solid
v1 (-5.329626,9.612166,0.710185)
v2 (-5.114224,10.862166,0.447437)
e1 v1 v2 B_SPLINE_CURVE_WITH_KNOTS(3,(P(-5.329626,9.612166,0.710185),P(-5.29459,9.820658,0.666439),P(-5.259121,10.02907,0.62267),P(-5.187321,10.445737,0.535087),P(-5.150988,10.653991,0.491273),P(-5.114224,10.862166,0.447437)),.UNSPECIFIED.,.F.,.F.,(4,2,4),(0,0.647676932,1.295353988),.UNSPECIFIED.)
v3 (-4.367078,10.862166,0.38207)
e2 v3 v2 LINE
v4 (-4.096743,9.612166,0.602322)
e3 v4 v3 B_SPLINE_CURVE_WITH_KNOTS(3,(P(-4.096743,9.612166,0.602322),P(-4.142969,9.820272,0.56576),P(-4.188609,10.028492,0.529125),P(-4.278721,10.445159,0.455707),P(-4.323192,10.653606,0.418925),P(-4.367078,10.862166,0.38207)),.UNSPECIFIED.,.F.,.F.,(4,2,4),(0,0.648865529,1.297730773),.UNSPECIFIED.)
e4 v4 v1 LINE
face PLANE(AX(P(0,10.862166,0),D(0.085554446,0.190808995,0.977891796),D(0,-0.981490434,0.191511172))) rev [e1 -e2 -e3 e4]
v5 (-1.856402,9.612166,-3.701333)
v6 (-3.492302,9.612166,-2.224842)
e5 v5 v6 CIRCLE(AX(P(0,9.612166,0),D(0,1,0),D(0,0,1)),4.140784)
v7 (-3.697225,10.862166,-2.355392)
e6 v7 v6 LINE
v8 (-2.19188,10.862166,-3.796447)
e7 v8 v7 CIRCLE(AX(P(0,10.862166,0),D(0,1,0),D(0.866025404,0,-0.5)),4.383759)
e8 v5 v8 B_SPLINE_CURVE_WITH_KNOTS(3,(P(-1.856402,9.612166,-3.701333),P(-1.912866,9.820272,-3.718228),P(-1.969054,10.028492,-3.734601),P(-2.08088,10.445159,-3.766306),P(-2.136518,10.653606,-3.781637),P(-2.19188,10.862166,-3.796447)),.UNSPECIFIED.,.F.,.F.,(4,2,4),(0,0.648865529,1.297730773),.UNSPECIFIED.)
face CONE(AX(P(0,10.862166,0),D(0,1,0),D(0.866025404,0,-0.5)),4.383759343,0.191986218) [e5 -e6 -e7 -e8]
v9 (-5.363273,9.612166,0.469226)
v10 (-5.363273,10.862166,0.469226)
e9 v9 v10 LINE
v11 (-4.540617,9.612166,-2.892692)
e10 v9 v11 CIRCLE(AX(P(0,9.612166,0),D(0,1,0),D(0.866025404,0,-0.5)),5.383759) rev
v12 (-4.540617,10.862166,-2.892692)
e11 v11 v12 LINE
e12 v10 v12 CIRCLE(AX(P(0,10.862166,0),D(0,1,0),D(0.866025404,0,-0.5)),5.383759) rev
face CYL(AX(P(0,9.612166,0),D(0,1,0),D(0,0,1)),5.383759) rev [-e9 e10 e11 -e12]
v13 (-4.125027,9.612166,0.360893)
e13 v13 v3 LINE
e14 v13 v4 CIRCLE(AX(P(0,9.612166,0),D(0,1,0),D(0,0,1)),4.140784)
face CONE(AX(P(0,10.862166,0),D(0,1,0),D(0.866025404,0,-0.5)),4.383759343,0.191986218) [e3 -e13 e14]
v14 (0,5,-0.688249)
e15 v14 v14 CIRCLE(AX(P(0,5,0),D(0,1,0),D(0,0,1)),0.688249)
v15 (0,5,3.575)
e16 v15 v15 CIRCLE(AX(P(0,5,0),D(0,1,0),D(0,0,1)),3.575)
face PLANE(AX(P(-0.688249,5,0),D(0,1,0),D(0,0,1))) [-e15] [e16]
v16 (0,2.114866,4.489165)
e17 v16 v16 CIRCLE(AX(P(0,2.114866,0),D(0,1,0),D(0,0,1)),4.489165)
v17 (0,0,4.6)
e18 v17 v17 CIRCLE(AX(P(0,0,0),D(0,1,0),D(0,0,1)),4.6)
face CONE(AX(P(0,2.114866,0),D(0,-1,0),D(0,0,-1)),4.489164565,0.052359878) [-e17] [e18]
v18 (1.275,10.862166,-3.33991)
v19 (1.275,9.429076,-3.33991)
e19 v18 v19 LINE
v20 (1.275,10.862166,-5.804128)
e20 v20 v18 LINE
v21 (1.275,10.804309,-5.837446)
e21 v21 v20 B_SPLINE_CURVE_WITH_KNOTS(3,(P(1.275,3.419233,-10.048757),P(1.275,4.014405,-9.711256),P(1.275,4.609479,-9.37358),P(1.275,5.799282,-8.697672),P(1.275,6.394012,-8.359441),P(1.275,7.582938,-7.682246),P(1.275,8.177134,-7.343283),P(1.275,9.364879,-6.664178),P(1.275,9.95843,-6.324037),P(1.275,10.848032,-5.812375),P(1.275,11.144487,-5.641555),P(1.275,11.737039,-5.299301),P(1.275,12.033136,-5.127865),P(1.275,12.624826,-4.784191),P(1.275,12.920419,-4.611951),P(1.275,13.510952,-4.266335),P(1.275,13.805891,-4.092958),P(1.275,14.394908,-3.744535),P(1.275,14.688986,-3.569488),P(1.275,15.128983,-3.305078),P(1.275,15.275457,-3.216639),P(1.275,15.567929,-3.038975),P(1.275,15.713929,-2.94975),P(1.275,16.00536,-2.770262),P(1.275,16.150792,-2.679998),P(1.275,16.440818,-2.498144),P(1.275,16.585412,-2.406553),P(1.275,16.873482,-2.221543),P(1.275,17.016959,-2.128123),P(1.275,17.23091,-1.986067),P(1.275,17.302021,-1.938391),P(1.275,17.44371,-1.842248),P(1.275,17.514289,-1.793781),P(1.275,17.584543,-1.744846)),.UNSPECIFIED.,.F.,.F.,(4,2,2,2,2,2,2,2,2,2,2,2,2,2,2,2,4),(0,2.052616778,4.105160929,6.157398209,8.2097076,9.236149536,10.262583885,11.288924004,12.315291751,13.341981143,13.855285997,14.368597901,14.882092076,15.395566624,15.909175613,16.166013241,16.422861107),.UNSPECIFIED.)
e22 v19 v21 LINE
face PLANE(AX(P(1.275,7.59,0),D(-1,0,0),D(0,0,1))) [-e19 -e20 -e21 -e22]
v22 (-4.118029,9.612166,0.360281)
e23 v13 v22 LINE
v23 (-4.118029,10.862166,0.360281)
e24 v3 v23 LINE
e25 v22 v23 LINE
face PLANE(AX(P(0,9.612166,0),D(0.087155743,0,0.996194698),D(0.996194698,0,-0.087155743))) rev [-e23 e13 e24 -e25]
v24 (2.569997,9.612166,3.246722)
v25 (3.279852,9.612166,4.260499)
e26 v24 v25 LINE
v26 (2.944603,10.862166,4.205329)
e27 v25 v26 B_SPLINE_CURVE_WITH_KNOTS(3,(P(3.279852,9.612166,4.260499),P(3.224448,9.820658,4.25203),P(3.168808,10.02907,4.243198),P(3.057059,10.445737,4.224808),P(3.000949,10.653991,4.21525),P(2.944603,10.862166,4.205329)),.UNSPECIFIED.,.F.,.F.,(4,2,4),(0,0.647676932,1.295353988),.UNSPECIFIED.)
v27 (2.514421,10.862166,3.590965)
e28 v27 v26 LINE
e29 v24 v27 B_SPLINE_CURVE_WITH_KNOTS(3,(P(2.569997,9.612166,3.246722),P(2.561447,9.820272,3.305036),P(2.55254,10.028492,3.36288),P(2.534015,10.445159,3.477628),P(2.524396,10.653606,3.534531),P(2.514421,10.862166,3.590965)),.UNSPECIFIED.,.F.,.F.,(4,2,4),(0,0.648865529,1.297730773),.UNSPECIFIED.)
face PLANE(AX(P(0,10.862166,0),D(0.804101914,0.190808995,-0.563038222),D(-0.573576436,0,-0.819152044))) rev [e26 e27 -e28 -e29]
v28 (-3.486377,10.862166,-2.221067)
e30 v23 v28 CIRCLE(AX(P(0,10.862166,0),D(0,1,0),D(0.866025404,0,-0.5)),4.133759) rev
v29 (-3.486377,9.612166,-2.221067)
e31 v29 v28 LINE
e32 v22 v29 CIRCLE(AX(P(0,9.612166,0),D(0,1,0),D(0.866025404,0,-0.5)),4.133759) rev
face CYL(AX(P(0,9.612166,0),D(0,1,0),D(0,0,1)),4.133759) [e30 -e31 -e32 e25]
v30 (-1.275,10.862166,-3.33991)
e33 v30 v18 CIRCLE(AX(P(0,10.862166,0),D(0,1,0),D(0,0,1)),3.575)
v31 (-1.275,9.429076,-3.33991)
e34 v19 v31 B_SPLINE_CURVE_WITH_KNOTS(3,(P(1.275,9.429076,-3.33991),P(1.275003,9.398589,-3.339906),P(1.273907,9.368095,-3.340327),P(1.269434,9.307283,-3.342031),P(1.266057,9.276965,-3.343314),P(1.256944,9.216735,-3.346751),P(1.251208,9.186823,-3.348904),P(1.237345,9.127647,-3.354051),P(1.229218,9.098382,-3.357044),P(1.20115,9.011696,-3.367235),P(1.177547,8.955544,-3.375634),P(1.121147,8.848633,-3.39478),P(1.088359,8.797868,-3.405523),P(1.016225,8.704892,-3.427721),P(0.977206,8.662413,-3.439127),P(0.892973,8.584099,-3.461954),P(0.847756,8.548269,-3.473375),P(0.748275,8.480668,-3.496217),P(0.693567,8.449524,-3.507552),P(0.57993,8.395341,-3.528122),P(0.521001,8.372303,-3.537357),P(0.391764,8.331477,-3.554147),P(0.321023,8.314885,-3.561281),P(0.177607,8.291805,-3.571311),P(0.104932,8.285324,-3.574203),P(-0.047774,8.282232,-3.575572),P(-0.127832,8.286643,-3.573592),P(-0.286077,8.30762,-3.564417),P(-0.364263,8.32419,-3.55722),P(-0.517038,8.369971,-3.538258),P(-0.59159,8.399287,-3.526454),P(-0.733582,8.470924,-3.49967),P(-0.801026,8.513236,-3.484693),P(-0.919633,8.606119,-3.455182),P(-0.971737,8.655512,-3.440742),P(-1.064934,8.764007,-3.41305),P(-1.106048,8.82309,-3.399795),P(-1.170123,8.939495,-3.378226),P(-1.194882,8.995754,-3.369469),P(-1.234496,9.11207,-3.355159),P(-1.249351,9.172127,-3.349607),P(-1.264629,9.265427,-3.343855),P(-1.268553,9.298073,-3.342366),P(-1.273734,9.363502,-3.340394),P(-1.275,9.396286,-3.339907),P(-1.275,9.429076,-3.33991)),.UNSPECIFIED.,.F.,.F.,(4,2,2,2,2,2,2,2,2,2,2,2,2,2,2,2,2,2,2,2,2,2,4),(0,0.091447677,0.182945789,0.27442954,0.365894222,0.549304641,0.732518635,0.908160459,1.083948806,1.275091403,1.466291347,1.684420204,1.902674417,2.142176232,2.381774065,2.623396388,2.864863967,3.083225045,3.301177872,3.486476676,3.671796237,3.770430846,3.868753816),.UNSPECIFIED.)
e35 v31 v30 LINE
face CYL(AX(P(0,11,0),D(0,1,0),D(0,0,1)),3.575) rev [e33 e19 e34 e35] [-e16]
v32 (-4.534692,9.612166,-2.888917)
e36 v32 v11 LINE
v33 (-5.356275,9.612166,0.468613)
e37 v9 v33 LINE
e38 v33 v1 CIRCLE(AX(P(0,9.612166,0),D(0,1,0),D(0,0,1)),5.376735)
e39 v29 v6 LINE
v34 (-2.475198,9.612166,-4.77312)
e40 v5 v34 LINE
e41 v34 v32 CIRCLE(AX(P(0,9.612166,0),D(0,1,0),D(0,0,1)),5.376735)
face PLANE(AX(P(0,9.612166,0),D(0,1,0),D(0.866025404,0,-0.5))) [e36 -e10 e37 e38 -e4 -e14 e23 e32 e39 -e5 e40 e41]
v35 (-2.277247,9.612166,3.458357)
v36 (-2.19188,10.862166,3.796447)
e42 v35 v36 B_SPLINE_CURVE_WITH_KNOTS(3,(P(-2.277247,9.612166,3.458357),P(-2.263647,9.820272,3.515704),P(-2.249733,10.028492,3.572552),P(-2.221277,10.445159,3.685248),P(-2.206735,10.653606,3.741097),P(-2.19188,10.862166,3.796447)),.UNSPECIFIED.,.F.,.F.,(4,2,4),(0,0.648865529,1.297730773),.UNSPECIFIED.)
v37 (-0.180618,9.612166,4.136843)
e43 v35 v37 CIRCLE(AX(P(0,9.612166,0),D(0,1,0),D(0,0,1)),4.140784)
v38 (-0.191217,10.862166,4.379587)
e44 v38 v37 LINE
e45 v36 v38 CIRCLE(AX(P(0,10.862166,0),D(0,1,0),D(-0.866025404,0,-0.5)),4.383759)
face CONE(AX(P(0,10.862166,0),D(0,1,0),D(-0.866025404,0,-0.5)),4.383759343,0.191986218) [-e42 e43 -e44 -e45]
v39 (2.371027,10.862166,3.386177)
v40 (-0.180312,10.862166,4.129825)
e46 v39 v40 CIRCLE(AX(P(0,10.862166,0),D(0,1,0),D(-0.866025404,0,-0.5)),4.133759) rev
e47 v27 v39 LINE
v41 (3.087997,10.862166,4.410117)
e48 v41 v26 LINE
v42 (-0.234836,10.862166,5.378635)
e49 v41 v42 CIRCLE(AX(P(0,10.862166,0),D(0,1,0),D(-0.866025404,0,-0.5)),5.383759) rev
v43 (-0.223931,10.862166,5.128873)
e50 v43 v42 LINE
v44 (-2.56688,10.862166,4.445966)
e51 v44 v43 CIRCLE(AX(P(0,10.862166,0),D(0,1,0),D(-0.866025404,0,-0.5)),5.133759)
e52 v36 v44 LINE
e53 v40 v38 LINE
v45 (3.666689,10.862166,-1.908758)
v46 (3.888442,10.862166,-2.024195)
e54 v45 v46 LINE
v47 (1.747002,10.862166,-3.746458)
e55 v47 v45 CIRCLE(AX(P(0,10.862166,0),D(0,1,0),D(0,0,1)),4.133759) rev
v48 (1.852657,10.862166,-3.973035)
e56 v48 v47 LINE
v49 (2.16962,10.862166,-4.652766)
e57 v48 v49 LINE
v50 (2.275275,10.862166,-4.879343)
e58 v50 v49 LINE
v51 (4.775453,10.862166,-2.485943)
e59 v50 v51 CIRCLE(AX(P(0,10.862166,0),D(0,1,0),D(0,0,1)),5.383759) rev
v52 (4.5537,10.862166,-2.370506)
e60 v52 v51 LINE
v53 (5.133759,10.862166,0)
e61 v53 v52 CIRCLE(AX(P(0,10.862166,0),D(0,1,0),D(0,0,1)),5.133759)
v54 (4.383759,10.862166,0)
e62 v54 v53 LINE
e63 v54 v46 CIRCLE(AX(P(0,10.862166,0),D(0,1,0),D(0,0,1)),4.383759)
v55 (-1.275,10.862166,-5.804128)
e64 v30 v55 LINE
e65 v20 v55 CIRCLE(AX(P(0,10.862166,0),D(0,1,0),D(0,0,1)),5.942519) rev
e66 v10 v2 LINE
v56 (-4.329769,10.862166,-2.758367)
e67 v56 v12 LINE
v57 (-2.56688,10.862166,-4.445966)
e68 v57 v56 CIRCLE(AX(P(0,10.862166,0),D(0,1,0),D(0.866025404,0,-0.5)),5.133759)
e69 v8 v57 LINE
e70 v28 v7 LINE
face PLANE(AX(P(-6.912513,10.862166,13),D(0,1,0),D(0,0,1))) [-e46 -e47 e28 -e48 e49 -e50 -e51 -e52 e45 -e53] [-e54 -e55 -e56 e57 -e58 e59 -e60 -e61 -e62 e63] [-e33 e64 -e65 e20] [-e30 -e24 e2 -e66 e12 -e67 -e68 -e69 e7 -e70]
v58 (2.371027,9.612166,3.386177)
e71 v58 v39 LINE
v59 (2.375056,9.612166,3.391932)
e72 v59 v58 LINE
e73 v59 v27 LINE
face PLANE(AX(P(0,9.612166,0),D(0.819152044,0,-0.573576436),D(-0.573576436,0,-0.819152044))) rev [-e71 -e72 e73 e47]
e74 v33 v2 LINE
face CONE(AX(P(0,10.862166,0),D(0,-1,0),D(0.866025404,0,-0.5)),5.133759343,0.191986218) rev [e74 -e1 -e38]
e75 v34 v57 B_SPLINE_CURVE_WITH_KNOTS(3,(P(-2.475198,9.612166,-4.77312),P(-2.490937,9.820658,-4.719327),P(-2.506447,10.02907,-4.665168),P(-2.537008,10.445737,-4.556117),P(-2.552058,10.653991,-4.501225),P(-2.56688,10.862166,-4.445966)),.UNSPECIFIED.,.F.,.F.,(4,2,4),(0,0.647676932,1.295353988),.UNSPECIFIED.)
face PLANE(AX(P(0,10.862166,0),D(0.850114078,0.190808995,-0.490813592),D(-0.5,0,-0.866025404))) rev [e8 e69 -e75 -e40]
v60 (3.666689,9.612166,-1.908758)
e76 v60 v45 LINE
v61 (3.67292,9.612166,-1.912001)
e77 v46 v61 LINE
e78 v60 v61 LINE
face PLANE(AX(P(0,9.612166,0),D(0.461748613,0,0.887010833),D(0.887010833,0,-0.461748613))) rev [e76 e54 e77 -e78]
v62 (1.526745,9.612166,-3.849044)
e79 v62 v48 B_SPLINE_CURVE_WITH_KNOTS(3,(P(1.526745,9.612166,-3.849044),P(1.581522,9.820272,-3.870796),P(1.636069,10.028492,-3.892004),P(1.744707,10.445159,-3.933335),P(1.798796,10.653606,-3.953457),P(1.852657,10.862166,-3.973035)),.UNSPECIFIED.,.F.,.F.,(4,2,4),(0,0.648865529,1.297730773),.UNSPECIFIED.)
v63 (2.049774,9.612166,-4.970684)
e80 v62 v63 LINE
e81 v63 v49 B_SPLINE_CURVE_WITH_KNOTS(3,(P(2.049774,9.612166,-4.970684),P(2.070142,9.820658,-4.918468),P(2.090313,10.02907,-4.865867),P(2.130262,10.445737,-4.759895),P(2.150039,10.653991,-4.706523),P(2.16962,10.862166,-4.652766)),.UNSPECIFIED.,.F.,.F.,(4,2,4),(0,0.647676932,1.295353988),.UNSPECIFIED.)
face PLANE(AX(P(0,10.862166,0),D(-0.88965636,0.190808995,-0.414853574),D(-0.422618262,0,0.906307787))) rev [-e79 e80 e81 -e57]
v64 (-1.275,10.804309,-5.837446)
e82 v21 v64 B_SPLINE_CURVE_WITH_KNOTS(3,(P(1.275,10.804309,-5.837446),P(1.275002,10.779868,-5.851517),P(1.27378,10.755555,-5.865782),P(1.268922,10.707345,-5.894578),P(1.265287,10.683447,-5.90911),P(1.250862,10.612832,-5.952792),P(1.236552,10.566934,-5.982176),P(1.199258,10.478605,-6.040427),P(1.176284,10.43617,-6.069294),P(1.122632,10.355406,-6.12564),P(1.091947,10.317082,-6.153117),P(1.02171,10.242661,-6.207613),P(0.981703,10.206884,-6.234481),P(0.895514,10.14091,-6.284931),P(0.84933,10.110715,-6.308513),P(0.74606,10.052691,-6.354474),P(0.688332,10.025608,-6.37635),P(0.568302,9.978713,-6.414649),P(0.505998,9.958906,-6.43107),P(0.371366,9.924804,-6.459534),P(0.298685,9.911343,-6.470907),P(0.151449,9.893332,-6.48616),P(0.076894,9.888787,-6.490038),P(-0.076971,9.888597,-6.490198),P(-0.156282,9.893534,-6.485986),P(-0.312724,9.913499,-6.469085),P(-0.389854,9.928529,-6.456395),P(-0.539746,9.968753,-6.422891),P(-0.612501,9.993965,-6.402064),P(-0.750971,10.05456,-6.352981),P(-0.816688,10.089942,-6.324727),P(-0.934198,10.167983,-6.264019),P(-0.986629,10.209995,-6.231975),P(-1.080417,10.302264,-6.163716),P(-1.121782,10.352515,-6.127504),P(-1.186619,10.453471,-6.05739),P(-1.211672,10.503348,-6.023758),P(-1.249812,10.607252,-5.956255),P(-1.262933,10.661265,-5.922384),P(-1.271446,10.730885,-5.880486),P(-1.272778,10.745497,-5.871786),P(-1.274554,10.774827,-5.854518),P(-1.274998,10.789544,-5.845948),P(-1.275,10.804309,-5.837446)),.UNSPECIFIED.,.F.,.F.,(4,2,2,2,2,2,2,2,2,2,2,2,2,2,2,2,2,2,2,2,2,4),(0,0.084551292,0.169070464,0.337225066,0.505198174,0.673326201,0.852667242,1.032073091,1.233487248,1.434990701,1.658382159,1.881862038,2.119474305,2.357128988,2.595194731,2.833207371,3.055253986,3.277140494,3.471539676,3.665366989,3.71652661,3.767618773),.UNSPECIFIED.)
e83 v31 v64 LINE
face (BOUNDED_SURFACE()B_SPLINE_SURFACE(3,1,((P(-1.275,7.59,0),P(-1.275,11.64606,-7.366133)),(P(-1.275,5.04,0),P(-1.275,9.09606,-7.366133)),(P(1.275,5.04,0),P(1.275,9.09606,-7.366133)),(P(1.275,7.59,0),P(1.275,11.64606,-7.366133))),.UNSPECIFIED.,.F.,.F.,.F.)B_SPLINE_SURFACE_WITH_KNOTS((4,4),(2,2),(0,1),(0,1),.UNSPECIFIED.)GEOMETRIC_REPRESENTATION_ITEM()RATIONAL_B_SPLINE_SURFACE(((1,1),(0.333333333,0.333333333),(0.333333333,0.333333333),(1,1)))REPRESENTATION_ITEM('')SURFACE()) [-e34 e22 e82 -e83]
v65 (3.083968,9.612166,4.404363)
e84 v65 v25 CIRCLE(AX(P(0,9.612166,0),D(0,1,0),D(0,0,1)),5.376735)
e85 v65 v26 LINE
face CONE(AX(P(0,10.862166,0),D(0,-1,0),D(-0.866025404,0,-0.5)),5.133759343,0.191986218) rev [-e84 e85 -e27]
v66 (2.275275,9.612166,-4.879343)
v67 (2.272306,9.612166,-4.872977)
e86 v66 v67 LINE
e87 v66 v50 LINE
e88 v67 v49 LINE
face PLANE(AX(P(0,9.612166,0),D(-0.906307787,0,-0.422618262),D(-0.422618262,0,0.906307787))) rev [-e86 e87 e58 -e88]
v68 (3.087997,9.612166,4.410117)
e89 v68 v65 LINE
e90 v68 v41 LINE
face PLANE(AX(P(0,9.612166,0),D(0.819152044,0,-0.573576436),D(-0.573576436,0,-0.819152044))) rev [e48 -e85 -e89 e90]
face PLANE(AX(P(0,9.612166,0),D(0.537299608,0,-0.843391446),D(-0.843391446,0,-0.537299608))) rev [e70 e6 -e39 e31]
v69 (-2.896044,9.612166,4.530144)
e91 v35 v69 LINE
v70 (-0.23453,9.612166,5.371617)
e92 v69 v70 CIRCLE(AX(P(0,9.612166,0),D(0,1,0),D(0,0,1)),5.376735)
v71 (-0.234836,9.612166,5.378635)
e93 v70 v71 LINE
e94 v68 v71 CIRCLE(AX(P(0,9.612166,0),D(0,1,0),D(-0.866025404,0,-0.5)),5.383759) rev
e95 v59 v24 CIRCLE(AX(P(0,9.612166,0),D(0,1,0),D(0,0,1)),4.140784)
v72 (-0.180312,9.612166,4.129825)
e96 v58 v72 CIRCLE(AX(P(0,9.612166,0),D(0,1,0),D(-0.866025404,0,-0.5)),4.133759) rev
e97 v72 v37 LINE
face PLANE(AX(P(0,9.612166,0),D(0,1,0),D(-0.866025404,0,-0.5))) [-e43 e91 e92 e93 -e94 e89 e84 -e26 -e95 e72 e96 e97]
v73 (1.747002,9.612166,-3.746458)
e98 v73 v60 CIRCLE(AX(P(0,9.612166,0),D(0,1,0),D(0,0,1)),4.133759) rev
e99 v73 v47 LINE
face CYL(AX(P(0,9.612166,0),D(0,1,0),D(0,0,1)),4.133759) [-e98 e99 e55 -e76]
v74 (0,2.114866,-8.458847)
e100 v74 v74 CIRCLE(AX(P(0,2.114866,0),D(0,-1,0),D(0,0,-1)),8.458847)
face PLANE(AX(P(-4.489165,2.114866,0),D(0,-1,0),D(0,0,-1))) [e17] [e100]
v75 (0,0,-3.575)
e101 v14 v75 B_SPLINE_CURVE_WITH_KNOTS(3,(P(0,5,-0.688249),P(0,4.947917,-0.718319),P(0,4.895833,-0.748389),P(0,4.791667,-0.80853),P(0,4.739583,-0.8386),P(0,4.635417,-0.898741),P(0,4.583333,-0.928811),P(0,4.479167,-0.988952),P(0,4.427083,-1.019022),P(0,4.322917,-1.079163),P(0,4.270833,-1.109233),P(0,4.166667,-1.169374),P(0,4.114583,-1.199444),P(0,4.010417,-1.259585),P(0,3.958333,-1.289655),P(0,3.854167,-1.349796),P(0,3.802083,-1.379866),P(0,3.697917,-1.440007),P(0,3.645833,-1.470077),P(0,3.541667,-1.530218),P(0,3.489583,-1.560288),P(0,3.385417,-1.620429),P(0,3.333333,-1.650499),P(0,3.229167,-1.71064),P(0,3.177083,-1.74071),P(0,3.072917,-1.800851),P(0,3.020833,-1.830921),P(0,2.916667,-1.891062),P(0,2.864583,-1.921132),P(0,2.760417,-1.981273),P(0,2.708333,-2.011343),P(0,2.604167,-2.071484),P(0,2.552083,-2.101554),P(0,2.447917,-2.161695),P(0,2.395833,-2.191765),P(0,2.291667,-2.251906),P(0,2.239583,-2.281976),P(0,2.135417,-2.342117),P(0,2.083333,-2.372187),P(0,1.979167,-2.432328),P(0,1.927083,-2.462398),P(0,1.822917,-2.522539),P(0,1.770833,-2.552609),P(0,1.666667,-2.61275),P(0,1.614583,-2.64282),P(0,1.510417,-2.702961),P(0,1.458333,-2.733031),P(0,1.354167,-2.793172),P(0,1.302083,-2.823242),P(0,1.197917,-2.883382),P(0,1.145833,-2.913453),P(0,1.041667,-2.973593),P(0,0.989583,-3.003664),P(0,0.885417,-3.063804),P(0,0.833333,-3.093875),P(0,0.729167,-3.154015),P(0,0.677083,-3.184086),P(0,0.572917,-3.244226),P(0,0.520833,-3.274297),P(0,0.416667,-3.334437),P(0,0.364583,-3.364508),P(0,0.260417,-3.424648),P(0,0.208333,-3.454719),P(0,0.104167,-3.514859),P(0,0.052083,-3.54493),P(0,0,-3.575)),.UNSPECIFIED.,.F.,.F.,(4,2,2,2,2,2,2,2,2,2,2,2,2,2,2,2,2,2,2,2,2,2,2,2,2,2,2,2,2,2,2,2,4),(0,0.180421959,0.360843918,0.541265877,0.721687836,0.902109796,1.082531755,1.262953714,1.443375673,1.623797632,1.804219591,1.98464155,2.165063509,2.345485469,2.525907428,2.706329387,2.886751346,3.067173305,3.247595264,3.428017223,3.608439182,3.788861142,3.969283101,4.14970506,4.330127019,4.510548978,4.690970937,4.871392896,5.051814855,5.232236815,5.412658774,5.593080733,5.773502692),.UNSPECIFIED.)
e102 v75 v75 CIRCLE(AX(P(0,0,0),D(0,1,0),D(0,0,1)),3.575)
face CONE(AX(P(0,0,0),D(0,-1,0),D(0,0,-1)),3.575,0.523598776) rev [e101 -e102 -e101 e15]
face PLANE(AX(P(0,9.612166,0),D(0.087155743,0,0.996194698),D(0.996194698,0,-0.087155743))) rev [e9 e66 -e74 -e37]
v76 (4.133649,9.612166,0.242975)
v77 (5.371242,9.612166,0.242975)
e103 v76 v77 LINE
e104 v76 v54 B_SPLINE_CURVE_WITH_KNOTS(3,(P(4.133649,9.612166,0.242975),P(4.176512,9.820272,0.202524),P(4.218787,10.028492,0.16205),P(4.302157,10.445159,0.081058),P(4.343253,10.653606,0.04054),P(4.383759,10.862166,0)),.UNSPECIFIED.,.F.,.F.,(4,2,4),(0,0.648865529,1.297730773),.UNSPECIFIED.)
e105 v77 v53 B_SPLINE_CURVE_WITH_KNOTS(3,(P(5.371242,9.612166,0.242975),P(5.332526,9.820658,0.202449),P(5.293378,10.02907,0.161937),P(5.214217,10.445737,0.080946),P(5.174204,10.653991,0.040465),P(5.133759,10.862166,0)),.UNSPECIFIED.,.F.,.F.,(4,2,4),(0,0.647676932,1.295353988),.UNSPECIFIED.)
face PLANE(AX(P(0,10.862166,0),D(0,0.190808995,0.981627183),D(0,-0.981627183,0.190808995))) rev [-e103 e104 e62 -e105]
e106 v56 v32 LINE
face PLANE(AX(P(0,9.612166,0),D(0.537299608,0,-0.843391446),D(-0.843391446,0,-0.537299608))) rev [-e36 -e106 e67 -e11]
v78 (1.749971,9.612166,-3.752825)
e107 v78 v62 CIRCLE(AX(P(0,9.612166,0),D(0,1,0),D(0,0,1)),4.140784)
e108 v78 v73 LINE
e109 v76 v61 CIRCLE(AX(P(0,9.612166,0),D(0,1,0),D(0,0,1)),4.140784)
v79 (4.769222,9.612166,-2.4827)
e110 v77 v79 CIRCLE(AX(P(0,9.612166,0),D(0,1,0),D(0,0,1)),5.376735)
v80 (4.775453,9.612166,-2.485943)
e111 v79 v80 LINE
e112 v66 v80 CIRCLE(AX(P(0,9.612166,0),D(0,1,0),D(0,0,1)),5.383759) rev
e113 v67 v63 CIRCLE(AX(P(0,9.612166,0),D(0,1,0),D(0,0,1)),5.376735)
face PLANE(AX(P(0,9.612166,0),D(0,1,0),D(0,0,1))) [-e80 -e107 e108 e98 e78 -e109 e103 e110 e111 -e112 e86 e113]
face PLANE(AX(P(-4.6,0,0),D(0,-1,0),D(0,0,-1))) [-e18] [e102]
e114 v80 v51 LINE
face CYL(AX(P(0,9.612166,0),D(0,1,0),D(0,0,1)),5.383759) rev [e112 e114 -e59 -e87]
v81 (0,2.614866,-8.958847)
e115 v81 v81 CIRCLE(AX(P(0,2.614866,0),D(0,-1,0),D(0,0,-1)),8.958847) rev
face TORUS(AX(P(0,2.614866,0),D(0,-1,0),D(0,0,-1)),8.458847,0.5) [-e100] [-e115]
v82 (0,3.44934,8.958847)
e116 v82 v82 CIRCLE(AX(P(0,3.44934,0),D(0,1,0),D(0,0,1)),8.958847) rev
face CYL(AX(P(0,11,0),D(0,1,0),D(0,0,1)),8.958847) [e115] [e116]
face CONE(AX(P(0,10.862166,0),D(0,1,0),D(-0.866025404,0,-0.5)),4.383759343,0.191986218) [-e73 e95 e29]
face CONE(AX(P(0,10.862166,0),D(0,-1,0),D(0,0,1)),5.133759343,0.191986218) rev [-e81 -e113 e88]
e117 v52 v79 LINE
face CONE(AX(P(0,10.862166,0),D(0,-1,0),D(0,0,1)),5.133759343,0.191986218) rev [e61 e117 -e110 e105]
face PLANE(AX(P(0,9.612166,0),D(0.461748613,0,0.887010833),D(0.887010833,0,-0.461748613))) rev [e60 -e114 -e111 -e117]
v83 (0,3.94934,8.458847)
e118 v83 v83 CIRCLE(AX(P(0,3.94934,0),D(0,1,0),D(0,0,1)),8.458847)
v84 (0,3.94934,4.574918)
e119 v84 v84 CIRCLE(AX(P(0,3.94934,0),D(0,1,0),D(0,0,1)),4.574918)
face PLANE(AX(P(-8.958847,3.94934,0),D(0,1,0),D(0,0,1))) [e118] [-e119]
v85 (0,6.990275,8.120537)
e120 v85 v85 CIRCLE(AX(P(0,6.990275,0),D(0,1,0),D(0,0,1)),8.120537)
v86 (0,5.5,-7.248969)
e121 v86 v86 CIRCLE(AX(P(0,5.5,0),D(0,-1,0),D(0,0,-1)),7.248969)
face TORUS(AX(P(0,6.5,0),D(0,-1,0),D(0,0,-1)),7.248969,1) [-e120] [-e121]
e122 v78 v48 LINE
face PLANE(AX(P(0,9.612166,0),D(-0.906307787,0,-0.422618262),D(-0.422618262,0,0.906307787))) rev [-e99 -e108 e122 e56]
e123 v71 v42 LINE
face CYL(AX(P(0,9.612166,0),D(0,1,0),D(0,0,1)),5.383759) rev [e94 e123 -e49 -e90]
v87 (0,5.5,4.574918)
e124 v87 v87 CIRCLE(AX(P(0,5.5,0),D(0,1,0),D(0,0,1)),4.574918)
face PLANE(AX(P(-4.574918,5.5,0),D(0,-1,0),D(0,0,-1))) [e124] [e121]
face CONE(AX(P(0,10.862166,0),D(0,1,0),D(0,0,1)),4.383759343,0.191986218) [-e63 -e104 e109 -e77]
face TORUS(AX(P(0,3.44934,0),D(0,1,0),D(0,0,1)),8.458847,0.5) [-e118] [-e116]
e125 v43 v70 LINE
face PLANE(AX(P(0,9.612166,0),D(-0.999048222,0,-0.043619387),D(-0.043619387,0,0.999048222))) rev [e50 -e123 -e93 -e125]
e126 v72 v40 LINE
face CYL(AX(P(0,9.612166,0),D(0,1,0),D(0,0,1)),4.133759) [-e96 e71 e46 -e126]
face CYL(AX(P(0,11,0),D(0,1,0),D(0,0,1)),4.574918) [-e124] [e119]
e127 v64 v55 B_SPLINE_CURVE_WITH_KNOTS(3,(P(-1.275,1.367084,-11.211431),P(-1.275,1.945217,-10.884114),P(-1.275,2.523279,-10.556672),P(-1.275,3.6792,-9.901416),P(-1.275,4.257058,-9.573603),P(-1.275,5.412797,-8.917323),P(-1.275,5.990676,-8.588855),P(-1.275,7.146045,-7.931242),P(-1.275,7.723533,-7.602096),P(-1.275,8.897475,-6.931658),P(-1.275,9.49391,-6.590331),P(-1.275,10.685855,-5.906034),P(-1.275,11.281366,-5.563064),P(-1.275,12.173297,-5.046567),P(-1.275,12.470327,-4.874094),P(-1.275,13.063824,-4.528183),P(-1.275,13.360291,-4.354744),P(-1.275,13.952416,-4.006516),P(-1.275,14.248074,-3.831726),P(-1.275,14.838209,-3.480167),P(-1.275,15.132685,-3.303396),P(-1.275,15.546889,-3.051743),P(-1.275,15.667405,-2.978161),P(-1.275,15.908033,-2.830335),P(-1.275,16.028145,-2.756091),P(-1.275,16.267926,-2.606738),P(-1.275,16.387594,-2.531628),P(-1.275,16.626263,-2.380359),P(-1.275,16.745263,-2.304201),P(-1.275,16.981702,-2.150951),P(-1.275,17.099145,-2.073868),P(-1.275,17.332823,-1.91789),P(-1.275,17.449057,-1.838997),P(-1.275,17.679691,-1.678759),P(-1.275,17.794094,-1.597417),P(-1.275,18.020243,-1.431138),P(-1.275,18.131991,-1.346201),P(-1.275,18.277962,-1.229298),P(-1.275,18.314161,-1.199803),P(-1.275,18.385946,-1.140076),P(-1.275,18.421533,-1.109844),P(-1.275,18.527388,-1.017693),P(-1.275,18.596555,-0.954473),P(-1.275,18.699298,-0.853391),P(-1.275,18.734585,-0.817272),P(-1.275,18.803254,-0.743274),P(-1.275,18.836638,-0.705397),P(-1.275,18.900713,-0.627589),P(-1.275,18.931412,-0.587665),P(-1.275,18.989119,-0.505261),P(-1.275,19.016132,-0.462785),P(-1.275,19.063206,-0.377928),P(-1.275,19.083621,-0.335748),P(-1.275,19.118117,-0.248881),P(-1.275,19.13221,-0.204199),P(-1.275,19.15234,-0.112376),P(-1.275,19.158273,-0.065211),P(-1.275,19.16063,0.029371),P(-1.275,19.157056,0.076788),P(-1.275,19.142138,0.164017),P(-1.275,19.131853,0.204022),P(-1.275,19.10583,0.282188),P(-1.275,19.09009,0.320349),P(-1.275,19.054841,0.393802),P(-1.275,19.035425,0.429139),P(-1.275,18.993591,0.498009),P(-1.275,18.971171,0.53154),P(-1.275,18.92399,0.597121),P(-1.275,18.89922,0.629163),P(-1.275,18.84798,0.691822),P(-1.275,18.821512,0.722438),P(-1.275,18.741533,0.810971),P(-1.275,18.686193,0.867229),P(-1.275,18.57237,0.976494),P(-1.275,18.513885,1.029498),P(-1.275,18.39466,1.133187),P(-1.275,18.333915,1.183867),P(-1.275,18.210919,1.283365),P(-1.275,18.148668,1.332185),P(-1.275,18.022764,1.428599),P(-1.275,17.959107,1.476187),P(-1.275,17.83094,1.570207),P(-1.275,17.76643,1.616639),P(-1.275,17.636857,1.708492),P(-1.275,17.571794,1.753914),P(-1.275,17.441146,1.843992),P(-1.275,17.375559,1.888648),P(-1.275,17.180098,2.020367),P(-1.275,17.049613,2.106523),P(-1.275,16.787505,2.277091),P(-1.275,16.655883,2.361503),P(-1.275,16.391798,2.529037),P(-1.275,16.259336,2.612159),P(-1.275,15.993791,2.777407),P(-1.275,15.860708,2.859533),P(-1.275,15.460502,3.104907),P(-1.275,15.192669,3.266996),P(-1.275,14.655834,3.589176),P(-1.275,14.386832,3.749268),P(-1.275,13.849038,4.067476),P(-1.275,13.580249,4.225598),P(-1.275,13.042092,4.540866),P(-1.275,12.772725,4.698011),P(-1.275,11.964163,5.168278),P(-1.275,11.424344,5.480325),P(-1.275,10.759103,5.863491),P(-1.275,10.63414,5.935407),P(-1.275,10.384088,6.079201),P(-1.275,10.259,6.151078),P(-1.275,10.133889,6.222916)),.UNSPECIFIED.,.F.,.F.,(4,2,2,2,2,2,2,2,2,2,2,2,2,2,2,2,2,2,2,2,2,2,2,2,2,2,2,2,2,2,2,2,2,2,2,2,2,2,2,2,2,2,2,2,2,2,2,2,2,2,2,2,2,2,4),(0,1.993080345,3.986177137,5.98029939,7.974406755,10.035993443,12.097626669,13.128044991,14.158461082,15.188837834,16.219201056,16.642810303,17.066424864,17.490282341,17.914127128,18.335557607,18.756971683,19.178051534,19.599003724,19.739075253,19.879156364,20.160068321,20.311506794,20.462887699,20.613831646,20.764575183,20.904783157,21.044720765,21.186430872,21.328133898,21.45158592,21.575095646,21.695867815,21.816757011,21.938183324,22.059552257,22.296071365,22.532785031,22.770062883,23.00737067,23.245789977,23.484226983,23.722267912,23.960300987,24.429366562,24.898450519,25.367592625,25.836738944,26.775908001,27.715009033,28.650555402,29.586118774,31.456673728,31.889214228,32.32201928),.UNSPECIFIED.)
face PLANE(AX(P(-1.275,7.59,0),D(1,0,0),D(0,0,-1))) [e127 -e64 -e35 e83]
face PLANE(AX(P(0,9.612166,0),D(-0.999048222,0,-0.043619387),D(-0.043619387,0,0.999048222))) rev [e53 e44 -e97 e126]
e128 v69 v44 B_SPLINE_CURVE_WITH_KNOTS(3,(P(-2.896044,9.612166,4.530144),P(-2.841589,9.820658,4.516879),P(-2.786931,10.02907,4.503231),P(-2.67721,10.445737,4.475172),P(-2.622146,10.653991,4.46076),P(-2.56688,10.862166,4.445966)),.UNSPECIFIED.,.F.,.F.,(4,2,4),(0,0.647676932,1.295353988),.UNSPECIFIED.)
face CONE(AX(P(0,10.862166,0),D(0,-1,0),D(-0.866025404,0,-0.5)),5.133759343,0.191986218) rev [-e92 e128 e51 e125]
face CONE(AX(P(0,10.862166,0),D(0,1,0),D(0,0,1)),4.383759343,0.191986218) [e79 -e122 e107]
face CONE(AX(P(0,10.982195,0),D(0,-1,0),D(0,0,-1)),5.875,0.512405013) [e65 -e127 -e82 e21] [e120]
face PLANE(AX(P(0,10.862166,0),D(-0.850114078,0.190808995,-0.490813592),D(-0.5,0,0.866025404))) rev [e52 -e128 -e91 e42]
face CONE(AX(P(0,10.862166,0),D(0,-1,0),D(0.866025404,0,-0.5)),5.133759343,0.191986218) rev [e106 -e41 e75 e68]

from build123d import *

# Parameters (mm, degrees)
FILLET3_R                    = 1
FILLET5_R                    = 0.5
CUT_EXTRUDE1_DEPTH           = 13
CUT_EXTRUDE1_DEPTH_BACK      = 16
SKETCH26_W                   = 13.418493541
SKETCH26_H                   = 3.548934904
CUT_EXTRUDE2_DEPTH           = 1.25
CUT_EXTRUDE2_DRAFT           = 11
CUT_EXTRUDE2_PROFILE_2_DEPTH = 1.25
CUT_EXTRUDE2_PROFILE_2_DRAFT = 11
CUT_EXTRUDE3_DEPTH           = 1.25
CIRPATTERN1_COUNT            = 3
CIRPATTERN1_COPY_1_DEPTH     = 1.25
CIRPATTERN1_COPY_1_DRAFT     = 11
CIRPATTERN1_COPY_2_DEPTH     = 1.25
CIRPATTERN1_COPY_2_DRAFT     = 11
CIRPATTERN1_COPY_3_DEPTH     = 1.25
CIRPATTERN1_COPY_3_DRAFT     = 11
CIRPATTERN1_COPY_4_DEPTH     = 1.25
CIRPATTERN1_COPY_4_DRAFT     = 11
CIRPATTERN1_COPY_5_DEPTH     = 1.25
CIRPATTERN1_COPY_5_DRAFT     = 11
CIRPATTERN1_COPY_6_DEPTH     = 1.25
CIRPATTERN1_COPY_6_DRAFT     = 11
CUT_SWEEP2_START             = 7.127158628
CUT_SWEEP2_DEPTH             = 3.327834792


# Read off the part's stored shape, not the designer's step: Cut-Sweep2
with BuildPart() as part:
    # Sketch23 → Revolve2 (revolve)
    with BuildSketch(Plane.XY, mode=Mode.PRIVATE) as revolve2_sk:
        Polygon((-4.6, 0), (-4.489164565, 2.11486609), (-4.638876985, 2.114866641), (-8.958846975, 2.114866641), (-8.958846975, 3.949340084), (-4.574918372, 3.949340084), (-4.574918372, 5.5), (-8.958846975, 5.5), (-5.875, 10.982195082), (-3.575, 11), (-3.575, 5), (-0.688248654, 5), (-3.575, 0), align=None)
    revolve(revolve2_sk.sketch.rotate(Axis((0, 11, 0), (0, -1, 0)), 270), axis=Axis((0, 11, 0), (0, -1, 0)))

    # Fillet3
    fillet3_edges = [part.edges().sort_by_distance(p)[0] for p in [
        (0, 5.5, -8.958846975),
    ]]
    fillet(fillet3_edges, radius=FILLET3_R)

    # Fillet5
    fillet5_edges = [part.edges().sort_by_distance(p)[0] for p in [
        (0, 2.114866641, -8.958846975),
        (0, 3.949340084, -8.958846975),
    ]]
    fillet(fillet5_edges, radius=FILLET5_R)

    # Sketch26 → Cut-Extrude1 (cut, two sides: drawn at the far end of the back side and taken through both)
    with BuildSketch(Plane.XY.offset(-CUT_EXTRUDE1_DEPTH_BACK)):
        with Locations((-0.203266201, 12.636633683)):
            Rectangle(SKETCH26_W, SKETCH26_H)
    extrude(amount=CUT_EXTRUDE1_DEPTH + CUT_EXTRUDE1_DEPTH_BACK, mode=Mode.SUBTRACT)


with BuildPart() as cut_extrude2_tool:
    # Sketch27 → Cut-Extrude2 (with draft: the straight prism first)
    with BuildSketch(Plane(origin=(0, 10.862166231, 0), x_dir=(1, 0, 0), z_dir=(0, 1, 0))):
        with BuildLine():
            ThreePointArc((3.888442027, 2.024194797), (4.258129874, 1.041957751), (4.383759343, 0))
            Line((4.383759343, 0), (5.133759343, 0))
            ThreePointArc((5.133759343, 0), (4.986636426, 1.22022217), (4.553700152, 2.370506257))
            Line((4.553700152, 2.370506257), (3.888442027, 2.024194797))
        make_face()
    extrude(amount=-CUT_EXTRUDE2_DEPTH)
    # Cut-Extrude2: the draft: its side faces are tilted about the plane it starts from
    cut_extrude2_sides = [cut_extrude2_tool.faces().sort_by_distance(p)[0] for p in [
        (4.22107109, 10.237166231, -2.197350527),
        (4.258129874, 10.237166231, -1.041957751),
        (4.758759343, 10.237166231, 0),
        (4.986636426, 10.237166231, -1.22022217),
    ]]
    draft(cut_extrude2_sides, Plane(origin=(0, 10.862166231, 0), x_dir=(1, 0, 0), z_dir=(0, 1, 0)), CUT_EXTRUDE2_DRAFT)


with BuildPart() as part_1:
    add(part.part)

    # Cut-Extrude2: cut by cut_extrude2_tool
    add(cut_extrude2_tool.part, mode=Mode.SUBTRACT)


with BuildPart() as cut_extrude2_profile_2_tool:
    # Sketch27 → Cut-Extrude2 profile 2 (with draft: the straight prism first)
    with BuildSketch(Plane(origin=(0, 10.862166231, 0), x_dir=(1, 0, 0), z_dir=(0, 1, 0))):
        with BuildLine():
            ThreePointArc((1.852656753, 3.973035229), (3.031426819, 3.166669768), (3.888442027, 2.024194797))
            Line((3.888442027, 2.024194797), (4.553700152, 2.370506257))
            ThreePointArc((4.553700152, 2.370506257), (3.550061611, 3.708442739), (2.16962045, 4.652766069))
            Line((2.16962045, 4.652766069), (1.852656753, 3.973035229))
        make_face()
    extrude(amount=-CUT_EXTRUDE2_PROFILE_2_DEPTH)
    # Cut-Extrude2 profile 2: the draft: its side faces are tilted about the plane it starts from
    cut_extrude2_profile_2_sides = [cut_extrude2_profile_2_tool.faces().sort_by_distance(p)[0] for p in [
        (3.550061611, 10.237166231, -3.708442739),
        (2.011138602, 10.237166231, -4.312900649),
        (3.031426819, 10.237166231, -3.166669768),
        (4.22107109, 10.237166231, -2.197350527),
    ]]
    draft(cut_extrude2_profile_2_sides, Plane(origin=(0, 10.862166231, 0), x_dir=(1, 0, 0), z_dir=(0, 1, 0)), CUT_EXTRUDE2_PROFILE_2_DRAFT)


with BuildPart() as part_2:
    add(part_1.part)

    # Cut-Extrude2 profile 2: cut by cut_extrude2_profile_2_tool
    add(cut_extrude2_profile_2_tool.part, mode=Mode.SUBTRACT)

    # Sketch27<3> → Cut-Extrude3 (cut)
    with BuildSketch(Plane(origin=(0, 10.862166231, 0), x_dir=(1, 0, 0), z_dir=(0, 1, 0))):
        with BuildLine():
            Line((3.666689319, 1.908757644), (3.888442027, 2.024194797))
            ThreePointArc((3.888442027, 2.024194797), (3.031426819, 3.166669768), (1.852656753, 3.973035229))
            Line((1.852656753, 3.973035229), (1.747002188, 3.746458282))
            ThreePointArc((1.747002188, 3.746458282), (2.858548555, 2.986078777), (3.666689319, 1.908757644))
        make_face()
        with BuildLine():
            ThreePointArc((1.852656753, 3.973035229), (3.031426819, 3.166669768), (3.888442027, 2.024194797))
            Line((3.888442027, 2.024194797), (4.553700152, 2.370506257))
            ThreePointArc((4.553700152, 2.370506257), (3.550061611, 3.708442739), (2.16962045, 4.652766069))
            Line((2.16962045, 4.652766069), (1.852656753, 3.973035229))
        make_face()
        with BuildLine():
            ThreePointArc((2.16962045, 4.652766069), (3.550061611, 3.708442739), (4.553700152, 2.370506257))
            Line((4.553700152, 2.370506257), (4.775452861, 2.485943411))
            ThreePointArc((4.775452861, 2.485943411), (3.722939875, 3.88903373), (2.275275015, 4.879343016))
            Line((2.275275015, 4.879343016), (2.16962045, 4.652766069))
        make_face()
    cut_extrude3 = extrude(amount=-CUT_EXTRUDE3_DEPTH, mode=Mode.SUBTRACT)

    # CirPattern1: Cut-Extrude3 ×3 about axis
    cirpattern1_axis = Axis((0, 0, 0), (0, 1, 0))
    for i in range(1, CIRPATTERN1_COUNT):
        add(cut_extrude3.rotate(cirpattern1_axis, i * 360 / CIRPATTERN1_COUNT), mode=Mode.SUBTRACT)


with BuildPart() as cirpattern1_copy_1_tool:
    # CirPattern1 copy 1 sketch → CirPattern1 copy 1 (with draft: the straight prism first)
    with BuildSketch(Plane(origin=(0, 10.862166231, 0), x_dir=(-0.4999999999999998, 0, -0.8660254037844387), z_dir=(0, 1, 0))):
        with BuildLine():
            ThreePointArc((3.888442027, 2.024194797), (4.258129874, 1.041957751), (4.383759343, 0))
            Line((4.383759343, 0), (5.133759343, 0))
            ThreePointArc((5.133759343, 0), (4.986636426, 1.22022217), (4.553700152, 2.370506257))
            Line((4.553700152, 2.370506257), (3.888442027, 2.024194797))
        make_face()
    extrude(amount=-CIRPATTERN1_COPY_1_DEPTH)
    # CirPattern1 copy 1: the draft: its side faces are tilted about the plane it starts from
    cirpattern1_copy_1_sides = [cirpattern1_copy_1_tool.faces().sort_by_distance(p)[0] for p in [
        (-4.013496922, 10.237166231, -2.556879532),
        (-3.031426819, 10.237166231, -3.166669768),
        (-2.379379671, 10.237166231, -4.121206482),
        (-3.55006161, 10.237166231, -3.708442739),
    ]]
    draft(cirpattern1_copy_1_sides, Plane(origin=(0, 10.862166231, 0), x_dir=(-0.4999999999999998, 0, -0.8660254037844387), z_dir=(0, 1, 0)), CIRPATTERN1_COPY_1_DRAFT)


with BuildPart() as part_3:
    add(part_2.part)

    # CirPattern1 copy 1: cut by cirpattern1_copy_1_tool
    add(cirpattern1_copy_1_tool.part, mode=Mode.SUBTRACT)


with BuildPart() as cirpattern1_copy_2_tool:
    # CirPattern1 copy 2 sketch → CirPattern1 copy 2 (with draft: the straight prism first)
    with BuildSketch(Plane(origin=(0, 10.862166231, 0), x_dir=(-0.5000000000000004, 0, 0.8660254037844384), z_dir=(0, 1, 0))):
        with BuildLine():
            ThreePointArc((3.888442027, 2.024194797), (4.258129874, 1.041957751), (4.383759343, 0))
            Line((4.383759343, 0), (5.133759343, 0))
            ThreePointArc((5.133759343, 0), (4.986636426, 1.22022217), (4.553700152, 2.370506257))
            Line((4.553700152, 2.370506257), (3.888442027, 2.024194797))
        make_face()
    extrude(amount=-CIRPATTERN1_COPY_2_DEPTH)
    # CirPattern1 copy 2: the draft: its side faces are tilted about the plane it starts from
    cirpattern1_copy_2_sides = [cirpattern1_copy_2_tool.faces().sort_by_distance(p)[0] for p in [
        (-0.207574168, 10.237166231, 4.754230059),
        (-1.226703055, 10.237166231, 4.208627519),
        (-2.379379672, 10.237166231, 4.121206482),
        (-1.436574816, 10.237166231, 4.928664909),
    ]]
    draft(cirpattern1_copy_2_sides, Plane(origin=(0, 10.862166231, 0), x_dir=(-0.5000000000000004, 0, 0.8660254037844384), z_dir=(0, 1, 0)), CIRPATTERN1_COPY_2_DRAFT)


with BuildPart() as part_4:
    add(part_3.part)

    # CirPattern1 copy 2: cut by cirpattern1_copy_2_tool
    add(cirpattern1_copy_2_tool.part, mode=Mode.SUBTRACT)


with BuildPart() as cirpattern1_copy_3_tool:
    # CirPattern1 copy 3 sketch → CirPattern1 copy 3 (with draft: the straight prism first)
    with BuildSketch(Plane(origin=(0, 10.862166231, 0), x_dir=(-0.4999999999999998, 0, -0.8660254037844387), z_dir=(0, 1, 0))):
        with BuildLine():
            ThreePointArc((1.852656753, 3.973035229), (3.031426819, 3.166669768), (3.888442027, 2.024194797))
            Line((3.888442027, 2.024194797), (4.553700152, 2.370506257))
            ThreePointArc((4.553700152, 2.370506257), (3.550061611, 3.708442739), (2.16962045, 4.652766069))
            Line((2.16962045, 4.652766069), (1.852656753, 3.973035229))
        make_face()
    extrude(amount=-CIRPATTERN1_COPY_3_DEPTH)
    # CirPattern1 copy 3: the draft: its side faces are tilted about the plane it starts from
    cirpattern1_copy_3_sides = [cirpattern1_copy_3_tool.faces().sort_by_distance(p)[0] for p in [
        (-4.986636426, 10.237166231, -1.220222171),
        (-4.740650827, 10.237166231, 0.414753205),
        (-4.258129874, 10.237166231, -1.041957751),
        (-4.013496922, 10.237166231, -2.556879532),
    ]]
    draft(cirpattern1_copy_3_sides, Plane(origin=(0, 10.862166231, 0), x_dir=(-0.4999999999999998, 0, -0.8660254037844387), z_dir=(0, 1, 0)), CIRPATTERN1_COPY_3_DRAFT)


with BuildPart() as part_5:
    add(part_4.part)

    # CirPattern1 copy 3: cut by cirpattern1_copy_3_tool
    add(cirpattern1_copy_3_tool.part, mode=Mode.SUBTRACT)


with BuildPart() as cirpattern1_copy_4_tool:
    # CirPattern1 copy 4 sketch → CirPattern1 copy 4 (with draft: the straight prism first)
    with BuildSketch(Plane(origin=(0, 10.862166231, 0), x_dir=(-0.5000000000000004, 0, 0.8660254037844384), z_dir=(0, 1, 0))):
        with BuildLine():
            ThreePointArc((1.852656753, 3.973035229), (3.031426819, 3.166669768), (3.888442027, 2.024194797))
            Line((3.888442027, 2.024194797), (4.553700152, 2.370506257))
            ThreePointArc((4.553700152, 2.370506257), (3.550061611, 3.708442739), (2.16962045, 4.652766069))
            Line((2.16962045, 4.652766069), (1.852656753, 3.973035229))
        make_face()
    extrude(amount=-CIRPATTERN1_COPY_4_DEPTH)
    # CirPattern1 copy 4: the draft: its side faces are tilted about the plane it starts from
    cirpattern1_copy_4_sides = [cirpattern1_copy_4_tool.faces().sort_by_distance(p)[0] for p in [
        (1.436574815, 10.237166231, 4.92866491),
        (2.729512225, 10.237166231, 3.898147444),
        (1.226703055, 10.237166231, 4.208627519),
        (-0.207574168, 10.237166231, 4.754230059),
    ]]
    draft(cirpattern1_copy_4_sides, Plane(origin=(0, 10.862166231, 0), x_dir=(-0.5000000000000004, 0, 0.8660254037844384), z_dir=(0, 1, 0)), CIRPATTERN1_COPY_4_DRAFT)


with BuildPart() as part_6:
    add(part_5.part)

    # CirPattern1 copy 4: cut by cirpattern1_copy_4_tool
    add(cirpattern1_copy_4_tool.part, mode=Mode.SUBTRACT)


with BuildPart() as cirpattern1_copy_5_tool:
    # CirPattern1 copy 5 sketch → CirPattern1 copy 5 (with draft: the straight prism first)
    with BuildSketch(Plane(origin=(0, 10.862166231, 0), x_dir=(-0.4999999999999998, 0, -0.8660254037844387), z_dir=(0, 1, 0))):
        with BuildLine():
            ThreePointArc((1.852656753, 3.973035229), (3.031426819, 3.166669768), (3.888442027, 2.024194797))
            Line((3.888442027, 2.024194797), (4.553700152, 2.370506257))
            ThreePointArc((4.553700152, 2.370506257), (3.550061611, 3.708442739), (2.16962045, 4.652766069))
            Line((2.16962045, 4.652766069), (1.852656753, 3.973035229))
        make_face()
    extrude(amount=-CIRPATTERN1_COPY_5_DEPTH)
    # CirPattern1 copy 5: the draft: its side faces are tilted about the plane it starts from
    cirpattern1_copy_5_sides = [cirpattern1_copy_5_tool.faces().sort_by_distance(p)[0] for p in [
        (-4.986636426, 10.237166231, -1.220222171),
        (-4.740650827, 10.237166231, 0.414753205),
        (-4.258129874, 10.237166231, -1.041957751),
        (-4.013496922, 10.237166231, -2.556879532),
    ]]
    draft(cirpattern1_copy_5_sides, Plane(origin=(0, 10.862166231, 0), x_dir=(-0.4999999999999998, 0, -0.8660254037844387), z_dir=(0, 1, 0)), CIRPATTERN1_COPY_5_DRAFT)


with BuildPart() as part_7:
    add(part_6.part)

    # CirPattern1 copy 5: cut by cirpattern1_copy_5_tool
    add(cirpattern1_copy_5_tool.part, mode=Mode.SUBTRACT)


with BuildPart() as cirpattern1_copy_6_tool:
    # CirPattern1 copy 6 sketch → CirPattern1 copy 6 (with draft: the straight prism first)
    with BuildSketch(Plane(origin=(0, 10.862166231, 0), x_dir=(-0.5000000000000004, 0, 0.8660254037844384), z_dir=(0, 1, 0))):
        with BuildLine():
            ThreePointArc((1.852656753, 3.973035229), (3.031426819, 3.166669768), (3.888442027, 2.024194797))
            Line((3.888442027, 2.024194797), (4.553700152, 2.370506257))
            ThreePointArc((4.553700152, 2.370506257), (3.550061611, 3.708442739), (2.16962045, 4.652766069))
            Line((2.16962045, 4.652766069), (1.852656753, 3.973035229))
        make_face()
    extrude(amount=-CIRPATTERN1_COPY_6_DEPTH)
    # CirPattern1 copy 6: the draft: its side faces are tilted about the plane it starts from
    cirpattern1_copy_6_sides = [cirpattern1_copy_6_tool.faces().sort_by_distance(p)[0] for p in [
        (1.436574815, 10.237166231, 4.92866491),
        (2.729512225, 10.237166231, 3.898147444),
        (1.226703055, 10.237166231, 4.208627519),
        (-0.207574168, 10.237166231, 4.754230059),
    ]]
    draft(cirpattern1_copy_6_sides, Plane(origin=(0, 10.862166231, 0), x_dir=(-0.5000000000000004, 0, 0.8660254037844384), z_dir=(0, 1, 0)), CIRPATTERN1_COPY_6_DRAFT)


with BuildPart() as part_8:
    add(part_7.part)

    # CirPattern1 copy 6: cut by cirpattern1_copy_6_tool
    add(cirpattern1_copy_6_tool.part, mode=Mode.SUBTRACT)

    # Cut-Sweep2 outline → Cut-Sweep2 (cut)
    with BuildSketch(Plane(origin=(0, 0, 0), x_dir=(1, 0, 0), z_dir=(0, 0.48234659737654595, -0.8759804564025776)).offset(CUT_SWEEP2_START)):
        with BuildLine():
            add(Edge.make_bspline(
                [(-1.275, -6.648691664), (-1.275, -4.4149415), (1.275, -4.4149415), (1.275, -6.648691664)],
                knots=[0, 0, 0, 0, 1, 1, 1, 1], degree=3, weights=[1, 0.333333333, 0.333333333, 1]))
            Line((-1.275, -6.648691664), (-1.275, -9))
            Line((-1.275, -9), (1.275, -9))
            Line((1.275, -9), (1.275, -6.648691664))
        make_face()
    extrude(amount=CUT_SWEEP2_DEPTH, mode=Mode.SUBTRACT)


solid = part_8.part
